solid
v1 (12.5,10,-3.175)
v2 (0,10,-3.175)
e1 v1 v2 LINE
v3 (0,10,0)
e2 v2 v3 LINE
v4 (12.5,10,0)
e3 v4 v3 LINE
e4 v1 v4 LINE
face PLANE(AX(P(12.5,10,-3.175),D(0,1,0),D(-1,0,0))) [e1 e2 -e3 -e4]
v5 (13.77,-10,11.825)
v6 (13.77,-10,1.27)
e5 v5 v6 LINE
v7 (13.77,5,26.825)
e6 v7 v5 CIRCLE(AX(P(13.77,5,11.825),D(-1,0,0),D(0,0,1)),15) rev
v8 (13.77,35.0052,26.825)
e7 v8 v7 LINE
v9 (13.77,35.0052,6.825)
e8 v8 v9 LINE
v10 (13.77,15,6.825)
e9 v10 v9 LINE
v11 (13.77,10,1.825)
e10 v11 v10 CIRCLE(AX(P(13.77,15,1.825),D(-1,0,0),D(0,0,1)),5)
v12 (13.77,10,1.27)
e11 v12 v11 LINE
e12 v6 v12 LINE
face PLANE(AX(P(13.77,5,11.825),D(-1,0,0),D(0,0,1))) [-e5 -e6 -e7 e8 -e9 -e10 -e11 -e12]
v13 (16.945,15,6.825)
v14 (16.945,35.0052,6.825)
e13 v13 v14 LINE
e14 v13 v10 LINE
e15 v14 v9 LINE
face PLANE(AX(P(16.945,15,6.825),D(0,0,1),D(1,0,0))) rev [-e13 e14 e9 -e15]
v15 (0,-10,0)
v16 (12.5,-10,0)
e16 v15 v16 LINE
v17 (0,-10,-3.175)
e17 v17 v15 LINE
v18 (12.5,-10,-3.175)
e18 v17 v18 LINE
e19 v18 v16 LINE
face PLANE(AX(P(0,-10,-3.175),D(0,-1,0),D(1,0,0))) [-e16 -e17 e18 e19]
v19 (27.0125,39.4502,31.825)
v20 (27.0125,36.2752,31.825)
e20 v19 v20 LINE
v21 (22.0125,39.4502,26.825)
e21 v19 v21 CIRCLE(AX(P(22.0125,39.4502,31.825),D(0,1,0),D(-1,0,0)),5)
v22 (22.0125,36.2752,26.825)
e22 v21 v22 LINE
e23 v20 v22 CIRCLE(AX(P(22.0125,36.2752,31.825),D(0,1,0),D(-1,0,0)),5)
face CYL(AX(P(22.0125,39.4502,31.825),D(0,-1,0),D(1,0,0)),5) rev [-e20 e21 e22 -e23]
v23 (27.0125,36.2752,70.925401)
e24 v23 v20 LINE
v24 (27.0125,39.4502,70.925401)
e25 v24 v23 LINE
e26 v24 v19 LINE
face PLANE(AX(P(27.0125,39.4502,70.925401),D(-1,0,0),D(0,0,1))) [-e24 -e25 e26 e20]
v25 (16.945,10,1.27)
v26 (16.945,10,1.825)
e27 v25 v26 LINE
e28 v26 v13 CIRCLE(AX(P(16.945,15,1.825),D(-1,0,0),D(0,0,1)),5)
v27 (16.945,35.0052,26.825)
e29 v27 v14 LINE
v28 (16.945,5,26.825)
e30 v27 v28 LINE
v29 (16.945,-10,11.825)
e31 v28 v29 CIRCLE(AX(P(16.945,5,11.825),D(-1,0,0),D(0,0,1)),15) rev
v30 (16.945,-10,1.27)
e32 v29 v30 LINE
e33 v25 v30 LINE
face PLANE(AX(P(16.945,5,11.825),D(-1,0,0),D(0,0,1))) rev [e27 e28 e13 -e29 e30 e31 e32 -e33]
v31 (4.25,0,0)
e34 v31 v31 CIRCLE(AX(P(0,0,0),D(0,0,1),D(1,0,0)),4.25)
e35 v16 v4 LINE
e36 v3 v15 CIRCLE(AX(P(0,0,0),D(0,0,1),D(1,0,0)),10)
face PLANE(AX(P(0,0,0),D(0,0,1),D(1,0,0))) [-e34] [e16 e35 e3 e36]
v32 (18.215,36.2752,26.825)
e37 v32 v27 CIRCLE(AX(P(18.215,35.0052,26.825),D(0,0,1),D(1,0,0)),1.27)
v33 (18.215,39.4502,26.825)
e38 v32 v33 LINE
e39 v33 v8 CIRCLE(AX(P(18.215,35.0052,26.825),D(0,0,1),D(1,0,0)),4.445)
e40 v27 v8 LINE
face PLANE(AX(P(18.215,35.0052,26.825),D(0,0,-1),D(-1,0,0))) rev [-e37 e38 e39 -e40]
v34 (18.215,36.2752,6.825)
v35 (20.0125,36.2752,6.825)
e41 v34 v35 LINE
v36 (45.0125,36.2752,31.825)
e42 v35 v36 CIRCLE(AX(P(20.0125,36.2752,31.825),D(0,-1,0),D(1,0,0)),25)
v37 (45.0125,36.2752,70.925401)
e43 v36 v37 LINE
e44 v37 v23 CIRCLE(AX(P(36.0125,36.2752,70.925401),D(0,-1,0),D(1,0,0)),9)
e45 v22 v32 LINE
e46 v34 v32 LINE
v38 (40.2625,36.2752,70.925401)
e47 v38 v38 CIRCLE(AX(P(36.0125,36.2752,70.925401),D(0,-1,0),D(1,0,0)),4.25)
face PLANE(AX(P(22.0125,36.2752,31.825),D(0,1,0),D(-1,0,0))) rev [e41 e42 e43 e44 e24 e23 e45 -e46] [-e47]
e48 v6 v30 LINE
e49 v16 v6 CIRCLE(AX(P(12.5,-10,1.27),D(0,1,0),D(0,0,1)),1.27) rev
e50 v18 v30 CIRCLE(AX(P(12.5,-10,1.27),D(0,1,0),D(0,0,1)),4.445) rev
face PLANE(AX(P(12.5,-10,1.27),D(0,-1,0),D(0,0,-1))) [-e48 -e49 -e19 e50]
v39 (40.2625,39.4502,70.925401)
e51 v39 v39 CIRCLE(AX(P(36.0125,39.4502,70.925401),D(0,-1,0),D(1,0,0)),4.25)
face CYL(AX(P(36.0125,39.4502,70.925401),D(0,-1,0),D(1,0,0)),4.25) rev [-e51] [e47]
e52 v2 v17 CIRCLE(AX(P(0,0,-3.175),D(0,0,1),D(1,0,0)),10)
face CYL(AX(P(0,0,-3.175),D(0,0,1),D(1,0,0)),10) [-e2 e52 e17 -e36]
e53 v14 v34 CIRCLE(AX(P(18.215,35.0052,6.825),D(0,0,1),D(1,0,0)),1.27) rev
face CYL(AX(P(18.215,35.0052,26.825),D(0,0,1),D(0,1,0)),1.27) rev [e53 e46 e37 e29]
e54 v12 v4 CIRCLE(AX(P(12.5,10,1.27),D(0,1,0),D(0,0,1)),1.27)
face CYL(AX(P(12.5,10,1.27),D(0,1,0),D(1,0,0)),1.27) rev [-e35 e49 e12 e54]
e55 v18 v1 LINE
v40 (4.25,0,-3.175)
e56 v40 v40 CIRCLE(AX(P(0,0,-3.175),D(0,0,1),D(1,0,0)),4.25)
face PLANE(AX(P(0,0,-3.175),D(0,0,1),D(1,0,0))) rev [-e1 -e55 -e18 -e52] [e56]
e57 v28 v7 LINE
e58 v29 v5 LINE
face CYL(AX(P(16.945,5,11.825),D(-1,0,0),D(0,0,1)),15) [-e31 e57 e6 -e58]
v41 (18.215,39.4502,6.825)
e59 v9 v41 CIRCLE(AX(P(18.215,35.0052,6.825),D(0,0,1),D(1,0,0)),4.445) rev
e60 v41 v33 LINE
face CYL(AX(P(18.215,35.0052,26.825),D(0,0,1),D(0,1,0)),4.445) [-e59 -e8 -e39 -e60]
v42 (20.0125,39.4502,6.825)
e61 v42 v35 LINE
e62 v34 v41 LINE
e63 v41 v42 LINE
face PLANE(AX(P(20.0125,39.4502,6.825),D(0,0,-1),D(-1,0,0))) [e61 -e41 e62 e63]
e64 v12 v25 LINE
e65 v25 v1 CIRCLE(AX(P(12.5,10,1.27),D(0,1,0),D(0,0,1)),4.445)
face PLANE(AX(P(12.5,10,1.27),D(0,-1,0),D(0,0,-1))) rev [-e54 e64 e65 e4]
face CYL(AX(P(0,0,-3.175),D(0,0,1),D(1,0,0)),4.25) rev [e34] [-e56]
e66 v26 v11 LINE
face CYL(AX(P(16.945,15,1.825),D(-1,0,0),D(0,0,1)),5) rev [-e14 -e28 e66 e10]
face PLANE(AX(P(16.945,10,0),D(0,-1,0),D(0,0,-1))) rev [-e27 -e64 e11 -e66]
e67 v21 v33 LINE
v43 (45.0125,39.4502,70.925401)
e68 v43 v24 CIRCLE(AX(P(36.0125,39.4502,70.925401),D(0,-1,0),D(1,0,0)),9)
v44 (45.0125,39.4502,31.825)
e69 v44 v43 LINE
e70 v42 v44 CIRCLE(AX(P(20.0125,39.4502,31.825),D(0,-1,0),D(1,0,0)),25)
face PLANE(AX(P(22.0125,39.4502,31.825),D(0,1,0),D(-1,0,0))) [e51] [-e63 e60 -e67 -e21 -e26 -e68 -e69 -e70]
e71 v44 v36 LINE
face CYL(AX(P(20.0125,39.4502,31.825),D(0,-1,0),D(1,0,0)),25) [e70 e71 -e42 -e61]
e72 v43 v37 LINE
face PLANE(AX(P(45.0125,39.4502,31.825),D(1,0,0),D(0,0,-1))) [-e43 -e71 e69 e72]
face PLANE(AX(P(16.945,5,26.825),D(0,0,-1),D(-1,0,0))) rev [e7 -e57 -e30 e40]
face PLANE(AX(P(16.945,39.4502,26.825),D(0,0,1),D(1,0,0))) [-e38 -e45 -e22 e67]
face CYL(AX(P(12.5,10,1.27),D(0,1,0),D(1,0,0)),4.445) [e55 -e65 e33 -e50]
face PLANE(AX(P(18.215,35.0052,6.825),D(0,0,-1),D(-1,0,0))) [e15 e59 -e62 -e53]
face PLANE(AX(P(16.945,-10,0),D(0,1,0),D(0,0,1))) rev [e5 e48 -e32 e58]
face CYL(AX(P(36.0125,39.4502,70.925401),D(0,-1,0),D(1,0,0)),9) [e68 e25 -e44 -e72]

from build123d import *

# Parameters (mm, degrees)
SKETCH1_R                    = 4.25
BASE_FLANGE1_DEPTH           = 3.175
EDGE_FLANGE1_DEPTH           = 20
EDGE_FLANGE1_START           = 3.175
EDGE_FLANGE1_FLAT_DEPTH      = 3.175
EDGE_FLANGE3_STRIP_W         = 15.24
EDGE_FLANGE3_STRIP_H         = 3.175
EDGE_FLANGE3_STRIP_CUT_DEPTH = 20
EDGE_FLANGE3_DEPTH           = 20
EDGE_FLANGE3_START           = -3.175
EDGE_FLANGE3_PROFILE_R       = 4.25
EDGE_FLANGE3_FLAT_DEPTH      = 3.175


# Sheet-metal steps are written as plain solids
with BuildPart() as part:
    # Sketch1 → Base-Flange1 (new body)
    with BuildSketch(Plane.XY):
        with BuildLine():
            Line((12.5, 10), (0, 10))
            ThreePointArc((0, 10), (-10, 0), (0, -10))
            Line((0, -10), (12.5, -10))
            Line((12.5, -10), (12.5, 10))
        make_face()
        Circle(SKETCH1_R, mode=Mode.SUBTRACT)
    extrude(amount=-BASE_FLANGE1_DEPTH)

    # Edge-Flange1 bend section (across the edge) → Edge-Flange1 (add)
    with BuildSketch(Plane(origin=(13.77, -10, 0), x_dir=(-1, 0, 0), z_dir=(0, 1, 0))):
        with BuildLine():
            Line((-3.175, 1.27), (0, 1.27))
            ThreePointArc((0, 1.27), (0.371974388, 0.371974388), (1.27, 0))
            Line((1.27, 0), (1.27, -3.175))
            ThreePointArc((1.27, -3.175), (-1.873089642, -1.873089642), (-3.175, 1.27))
        make_face()
    extrude(amount=EDGE_FLANGE1_DEPTH)

    # Edge-Flange1 profile (on flange) → Edge-Flange1 flat (add)
    with BuildSketch(Plane.YZ.offset(13.77).offset(EDGE_FLANGE1_START)):
        with BuildLine():
            Line((36.2752, 26.825), (5, 26.825))
            ThreePointArc((5, 26.825), (-5.606601718, 22.431601718), (-10, 11.825))
            Line((-10, 11.825), (-10, 1.27))
            Line((-10, 1.27), (10, 1.27))
            Line((10, 1.27), (10, 1.825))
            ThreePointArc((10, 1.825), (11.464466094, 5.360533906), (15, 6.825))
            Line((15, 6.825), (36.2752, 6.825))
            Line((36.2752, 6.825), (36.2752, 26.825))
        make_face()
    extrude(amount=-EDGE_FLANGE1_FLAT_DEPTH)

    # Edge-Flange3 strip (across the edge) → Edge-Flange3 strip cut (cut)
    with BuildSketch(Plane(origin=(16.945, 36.2752, 6.825), x_dir=(0, -1, 0), z_dir=(0, 0, 1))):
        with Locations((-6.35, -1.5875)):
            Rectangle(EDGE_FLANGE3_STRIP_W, EDGE_FLANGE3_STRIP_H)
    extrude(amount=EDGE_FLANGE3_STRIP_CUT_DEPTH, mode=Mode.SUBTRACT)

    # Edge-Flange3 bend section (across the edge) → Edge-Flange3 (add)
    with BuildSketch(Plane(origin=(16.945, 36.2752, 6.825), x_dir=(0, -1, 0), z_dir=(0, 0, 1))):
        with BuildLine():
            Line((-3.175, 1.27), (0, 1.27))
            ThreePointArc((0, 1.27), (0.371974388, 0.371974388), (1.27, 0))
            Line((1.27, 0), (1.27, -3.175))
            ThreePointArc((1.27, -3.175), (-1.873089642, -1.873089642), (-3.175, 1.27))
        make_face()
    extrude(amount=EDGE_FLANGE3_DEPTH)

    # Edge-Flange3 profile (on flange) → Edge-Flange3 flat (add)
    with BuildSketch(Plane(origin=(16.945, 36.2752, 0), x_dir=(0, 0, -1), z_dir=(0, -1, 0)).offset(EDGE_FLANGE3_START)):
        with BuildLine():
            ThreePointArc((-6.825, 3.0675), (-14.14733047, 20.74516953), (-31.825, 28.0675))
            Line((-31.825, 28.0675), (-70.925400974, 28.0675))
            ThreePointArc((-70.925400974, 28.0675), (-79.925400974, 19.0675), (-70.925400974, 10.0675))
            Line((-70.925400974, 10.0675), (-31.825, 10.0675))
            ThreePointArc((-31.825, 10.0675), (-28.289466094, 8.603033906), (-26.825, 5.0675))
            Line((-26.825, 5.0675), (-26.825, 1.27))
            Line((-26.825, 1.27), (-6.825, 1.27))
            Line((-6.825, 1.27), (-6.825, 3.0675))
        make_face()
        with Locations((-70.925400974, 19.0675)):
            Circle(EDGE_FLANGE3_PROFILE_R, mode=Mode.SUBTRACT)
    extrude(amount=EDGE_FLANGE3_FLAT_DEPTH)


solid = part.part
